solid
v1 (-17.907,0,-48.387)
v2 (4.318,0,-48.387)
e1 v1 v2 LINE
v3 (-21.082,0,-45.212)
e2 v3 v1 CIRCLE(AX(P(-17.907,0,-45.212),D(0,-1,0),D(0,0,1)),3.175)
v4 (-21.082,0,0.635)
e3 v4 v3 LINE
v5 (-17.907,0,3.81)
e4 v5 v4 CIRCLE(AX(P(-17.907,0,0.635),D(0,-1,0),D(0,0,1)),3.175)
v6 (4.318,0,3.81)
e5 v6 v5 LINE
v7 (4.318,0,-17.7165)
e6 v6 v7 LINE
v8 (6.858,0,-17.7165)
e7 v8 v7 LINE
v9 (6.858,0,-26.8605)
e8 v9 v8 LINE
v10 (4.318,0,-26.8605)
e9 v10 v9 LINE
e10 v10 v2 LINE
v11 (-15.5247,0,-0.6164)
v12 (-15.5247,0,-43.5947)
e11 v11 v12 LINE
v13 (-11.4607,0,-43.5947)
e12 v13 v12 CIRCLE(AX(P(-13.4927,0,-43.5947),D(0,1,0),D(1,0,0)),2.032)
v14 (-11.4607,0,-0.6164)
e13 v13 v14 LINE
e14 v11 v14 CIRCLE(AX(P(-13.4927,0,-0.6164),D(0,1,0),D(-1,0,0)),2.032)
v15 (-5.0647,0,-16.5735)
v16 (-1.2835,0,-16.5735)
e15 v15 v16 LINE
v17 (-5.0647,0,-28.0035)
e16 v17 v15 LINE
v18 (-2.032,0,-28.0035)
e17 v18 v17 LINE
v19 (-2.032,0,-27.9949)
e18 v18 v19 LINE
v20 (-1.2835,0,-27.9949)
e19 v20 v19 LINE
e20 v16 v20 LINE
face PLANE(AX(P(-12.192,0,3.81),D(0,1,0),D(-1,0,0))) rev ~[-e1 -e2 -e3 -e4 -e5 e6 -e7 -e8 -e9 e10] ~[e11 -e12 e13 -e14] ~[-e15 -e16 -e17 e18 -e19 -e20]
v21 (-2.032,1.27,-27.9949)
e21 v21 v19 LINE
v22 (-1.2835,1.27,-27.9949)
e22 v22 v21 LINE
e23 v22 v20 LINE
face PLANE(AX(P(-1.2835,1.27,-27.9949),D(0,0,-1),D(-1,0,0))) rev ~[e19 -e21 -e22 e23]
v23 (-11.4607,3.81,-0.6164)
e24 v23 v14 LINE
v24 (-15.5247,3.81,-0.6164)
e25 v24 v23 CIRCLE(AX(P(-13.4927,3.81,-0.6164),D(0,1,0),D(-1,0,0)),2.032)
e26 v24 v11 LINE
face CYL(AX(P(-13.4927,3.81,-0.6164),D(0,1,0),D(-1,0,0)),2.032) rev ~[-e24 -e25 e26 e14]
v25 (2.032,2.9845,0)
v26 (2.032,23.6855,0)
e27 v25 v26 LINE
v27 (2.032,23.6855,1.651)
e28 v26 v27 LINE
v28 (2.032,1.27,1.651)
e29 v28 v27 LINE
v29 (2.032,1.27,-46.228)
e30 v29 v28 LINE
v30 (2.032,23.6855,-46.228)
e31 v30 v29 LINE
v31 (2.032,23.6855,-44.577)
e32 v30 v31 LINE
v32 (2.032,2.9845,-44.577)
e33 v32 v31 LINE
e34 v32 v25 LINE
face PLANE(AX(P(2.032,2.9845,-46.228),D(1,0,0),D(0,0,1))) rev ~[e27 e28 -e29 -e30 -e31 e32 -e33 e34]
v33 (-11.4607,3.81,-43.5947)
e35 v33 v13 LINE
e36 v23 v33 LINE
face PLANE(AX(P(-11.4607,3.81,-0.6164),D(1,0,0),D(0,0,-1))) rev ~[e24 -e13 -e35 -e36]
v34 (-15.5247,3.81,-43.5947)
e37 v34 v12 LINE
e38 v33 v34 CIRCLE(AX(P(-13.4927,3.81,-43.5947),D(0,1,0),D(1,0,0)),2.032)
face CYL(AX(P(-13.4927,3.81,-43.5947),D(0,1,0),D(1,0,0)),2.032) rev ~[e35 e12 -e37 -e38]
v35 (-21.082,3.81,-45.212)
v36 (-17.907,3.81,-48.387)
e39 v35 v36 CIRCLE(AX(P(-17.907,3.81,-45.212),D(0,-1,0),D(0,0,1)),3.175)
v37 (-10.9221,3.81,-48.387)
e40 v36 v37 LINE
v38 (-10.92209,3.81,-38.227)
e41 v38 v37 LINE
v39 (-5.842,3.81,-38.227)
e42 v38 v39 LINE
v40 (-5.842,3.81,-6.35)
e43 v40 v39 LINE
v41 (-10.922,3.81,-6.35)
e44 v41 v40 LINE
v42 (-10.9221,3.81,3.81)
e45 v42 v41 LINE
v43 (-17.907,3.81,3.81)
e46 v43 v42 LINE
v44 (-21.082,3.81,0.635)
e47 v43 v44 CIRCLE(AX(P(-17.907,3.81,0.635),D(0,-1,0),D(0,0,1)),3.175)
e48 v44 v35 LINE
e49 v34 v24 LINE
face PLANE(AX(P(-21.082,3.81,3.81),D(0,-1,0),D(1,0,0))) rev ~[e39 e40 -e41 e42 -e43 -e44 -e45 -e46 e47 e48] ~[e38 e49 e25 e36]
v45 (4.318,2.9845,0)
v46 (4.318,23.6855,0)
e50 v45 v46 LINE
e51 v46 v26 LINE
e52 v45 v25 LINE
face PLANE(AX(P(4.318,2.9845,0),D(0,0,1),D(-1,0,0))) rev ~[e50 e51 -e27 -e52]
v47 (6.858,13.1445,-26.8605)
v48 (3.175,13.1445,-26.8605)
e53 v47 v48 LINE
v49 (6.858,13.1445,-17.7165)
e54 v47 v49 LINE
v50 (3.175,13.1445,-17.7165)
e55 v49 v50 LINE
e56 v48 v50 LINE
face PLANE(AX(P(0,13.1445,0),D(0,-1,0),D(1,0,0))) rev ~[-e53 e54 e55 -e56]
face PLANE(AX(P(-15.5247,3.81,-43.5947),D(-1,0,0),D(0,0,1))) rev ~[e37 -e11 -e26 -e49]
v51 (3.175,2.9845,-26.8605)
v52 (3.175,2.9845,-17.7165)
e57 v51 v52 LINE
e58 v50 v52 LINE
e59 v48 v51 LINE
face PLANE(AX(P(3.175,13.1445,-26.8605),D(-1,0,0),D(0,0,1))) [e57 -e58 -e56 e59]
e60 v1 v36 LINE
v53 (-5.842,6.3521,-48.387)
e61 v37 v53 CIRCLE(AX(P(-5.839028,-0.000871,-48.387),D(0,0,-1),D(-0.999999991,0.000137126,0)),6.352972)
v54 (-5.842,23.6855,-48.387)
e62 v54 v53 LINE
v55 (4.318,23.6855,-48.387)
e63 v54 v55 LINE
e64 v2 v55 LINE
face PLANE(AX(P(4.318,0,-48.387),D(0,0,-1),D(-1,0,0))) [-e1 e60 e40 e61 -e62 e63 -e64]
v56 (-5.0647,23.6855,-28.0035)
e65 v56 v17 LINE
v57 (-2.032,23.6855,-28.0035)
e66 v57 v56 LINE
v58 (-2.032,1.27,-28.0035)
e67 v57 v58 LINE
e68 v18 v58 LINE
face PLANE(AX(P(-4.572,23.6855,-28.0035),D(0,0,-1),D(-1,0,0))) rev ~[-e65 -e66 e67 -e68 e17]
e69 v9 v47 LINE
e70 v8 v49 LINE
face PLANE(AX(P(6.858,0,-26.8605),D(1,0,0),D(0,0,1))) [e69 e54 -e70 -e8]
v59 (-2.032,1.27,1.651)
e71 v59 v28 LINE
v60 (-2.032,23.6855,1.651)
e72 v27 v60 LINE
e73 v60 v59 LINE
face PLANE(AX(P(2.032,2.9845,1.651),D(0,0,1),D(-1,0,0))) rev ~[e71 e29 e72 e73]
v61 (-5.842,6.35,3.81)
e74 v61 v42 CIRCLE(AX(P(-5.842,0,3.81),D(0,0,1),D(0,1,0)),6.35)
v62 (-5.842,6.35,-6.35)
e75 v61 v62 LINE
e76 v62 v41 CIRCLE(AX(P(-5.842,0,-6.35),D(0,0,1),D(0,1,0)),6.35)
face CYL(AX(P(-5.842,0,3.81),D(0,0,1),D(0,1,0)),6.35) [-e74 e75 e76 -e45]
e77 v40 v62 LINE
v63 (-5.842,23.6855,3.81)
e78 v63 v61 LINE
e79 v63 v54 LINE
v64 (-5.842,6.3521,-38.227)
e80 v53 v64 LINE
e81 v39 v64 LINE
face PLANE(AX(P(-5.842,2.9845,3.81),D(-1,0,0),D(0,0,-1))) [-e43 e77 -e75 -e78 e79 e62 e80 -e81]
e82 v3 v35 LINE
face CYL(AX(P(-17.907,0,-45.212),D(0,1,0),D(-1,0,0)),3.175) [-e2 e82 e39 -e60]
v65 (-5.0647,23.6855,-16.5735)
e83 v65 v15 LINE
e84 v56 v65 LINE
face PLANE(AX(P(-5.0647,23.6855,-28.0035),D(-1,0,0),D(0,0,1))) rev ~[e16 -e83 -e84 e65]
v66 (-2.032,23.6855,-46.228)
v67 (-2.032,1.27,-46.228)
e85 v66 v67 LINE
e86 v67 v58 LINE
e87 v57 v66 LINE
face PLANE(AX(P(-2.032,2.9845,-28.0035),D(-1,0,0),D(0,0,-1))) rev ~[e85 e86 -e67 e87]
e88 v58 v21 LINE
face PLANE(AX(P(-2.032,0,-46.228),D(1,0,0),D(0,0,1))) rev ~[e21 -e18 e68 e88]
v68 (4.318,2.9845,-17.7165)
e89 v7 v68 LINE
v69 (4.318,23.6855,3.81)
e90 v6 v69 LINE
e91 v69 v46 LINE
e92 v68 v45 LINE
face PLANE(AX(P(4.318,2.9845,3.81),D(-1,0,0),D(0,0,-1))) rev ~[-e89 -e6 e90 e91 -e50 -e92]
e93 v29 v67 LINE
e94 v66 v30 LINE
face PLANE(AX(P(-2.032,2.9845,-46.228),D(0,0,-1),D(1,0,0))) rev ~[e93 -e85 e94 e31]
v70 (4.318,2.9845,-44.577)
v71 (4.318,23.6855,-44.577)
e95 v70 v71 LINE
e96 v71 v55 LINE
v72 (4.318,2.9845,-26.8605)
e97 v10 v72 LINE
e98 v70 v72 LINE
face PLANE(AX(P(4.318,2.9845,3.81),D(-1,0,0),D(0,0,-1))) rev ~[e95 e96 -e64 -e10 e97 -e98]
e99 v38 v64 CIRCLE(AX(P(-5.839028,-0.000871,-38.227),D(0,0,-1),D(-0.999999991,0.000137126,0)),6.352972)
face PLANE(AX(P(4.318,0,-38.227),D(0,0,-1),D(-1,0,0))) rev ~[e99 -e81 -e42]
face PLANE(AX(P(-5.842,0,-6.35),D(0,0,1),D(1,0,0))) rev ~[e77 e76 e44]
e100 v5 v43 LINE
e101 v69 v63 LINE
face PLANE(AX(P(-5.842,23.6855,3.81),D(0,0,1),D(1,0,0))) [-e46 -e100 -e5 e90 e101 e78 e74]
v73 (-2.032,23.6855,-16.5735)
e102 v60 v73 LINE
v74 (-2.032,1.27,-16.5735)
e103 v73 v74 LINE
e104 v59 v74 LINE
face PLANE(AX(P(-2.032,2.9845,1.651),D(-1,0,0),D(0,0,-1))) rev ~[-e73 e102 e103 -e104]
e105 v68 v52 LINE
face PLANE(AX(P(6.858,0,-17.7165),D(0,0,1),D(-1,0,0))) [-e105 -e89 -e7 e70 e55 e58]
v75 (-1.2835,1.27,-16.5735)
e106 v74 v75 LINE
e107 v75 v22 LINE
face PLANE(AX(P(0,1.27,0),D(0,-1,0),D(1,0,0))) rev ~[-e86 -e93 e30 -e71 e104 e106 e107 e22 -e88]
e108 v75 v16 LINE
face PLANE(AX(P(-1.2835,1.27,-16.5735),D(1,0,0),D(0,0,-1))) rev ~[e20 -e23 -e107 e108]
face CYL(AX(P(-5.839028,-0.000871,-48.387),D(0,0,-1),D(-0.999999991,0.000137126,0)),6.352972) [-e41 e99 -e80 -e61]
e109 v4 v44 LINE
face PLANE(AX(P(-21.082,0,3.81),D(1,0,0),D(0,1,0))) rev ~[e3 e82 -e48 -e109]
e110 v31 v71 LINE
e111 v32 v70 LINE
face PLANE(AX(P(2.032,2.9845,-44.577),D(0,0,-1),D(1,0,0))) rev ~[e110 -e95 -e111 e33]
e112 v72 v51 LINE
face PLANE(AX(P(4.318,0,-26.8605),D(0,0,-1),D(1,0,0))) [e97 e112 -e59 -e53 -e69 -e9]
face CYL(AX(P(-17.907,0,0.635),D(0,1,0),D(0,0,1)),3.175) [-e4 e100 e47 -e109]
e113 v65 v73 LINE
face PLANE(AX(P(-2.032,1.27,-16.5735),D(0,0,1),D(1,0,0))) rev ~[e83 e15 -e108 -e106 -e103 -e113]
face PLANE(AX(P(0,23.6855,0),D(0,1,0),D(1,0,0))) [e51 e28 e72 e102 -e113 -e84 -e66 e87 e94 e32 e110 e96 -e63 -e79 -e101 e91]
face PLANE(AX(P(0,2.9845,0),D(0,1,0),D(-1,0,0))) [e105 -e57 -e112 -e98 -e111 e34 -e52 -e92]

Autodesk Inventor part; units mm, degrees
ref_plane "YZ Plane" through (0, 0, 0) normal (1, 0, 0) x (0, 1, 0)
ref_plane "XZ Plane" through (0, 0, 0) normal (0, 1, 0) x (-1, 0, 0)
ref_plane "XY Plane" through (0, 0, 0) normal (0, 0, 1) x (1, 0, 0)
sketch "Sketch1" plane through (0, 0, 0) normal (0, 1, 0) x (-1, 0, 0)
  line L0 (0, 0) -> (2.032, 0) construction
  line L1 (0, 0) -> (-2.032, 0) construction
  line L2 (-4.318, 0) -> (-4.318, 3.81)
  line L3 (-4.318, 3.81) -> (5.842, 3.81)
  line L4 (-2.032, 0) -> (-2.032, 1.651)
  line L5 (-2.032, 1.651) -> (2.032, 1.651)
  line L6 (2.032, -46.228) -> (-2.032, -46.228)
  line L7 (-2.032, -46.228) -> (-2.032, -44.577)
  line L8 (-4.318, -44.577) -> (-4.318, -48.387)
  line L9 (-4.318, -48.387) -> (5.842, -48.387)
  line L10 (2.032, 1.651) -> (2.032, -16.5735)
  line L11 (2.032, -16.5735) -> (4.572, -16.5735)
  line L12 (4.572, -16.5735) -> (4.572, -28.0035)
  line L13 (4.572, -28.0035) -> (2.032, -28.0035)
  line L14 (2.032, -28.0035) -> (2.032, -46.228)
  line L15 (5.842, 3.81) -> (5.842, -48.387)
  line L16 (-2.032, -40.8058) -> (4.191, -40.8058) construction
  line L17 (-2.032, 0) -> (-2.032, -44.577)
  line L18 (-4.318, 0) -> (-4.318, -44.577)
  dimension "d0" = 2.032
  dimension "d1" = 2.032
  dimension "d3" = 2.286
  dimension "d5" = 3.81
  dimension "d7" = 10.16
  dimension "d8" = 4.064
  dimension "d9" = 2.159
  dimension "d10" = 1.651
  dimension "d12" = 2.286
  dimension "d13" = 3.81
  dimension "d14" = 1.651
  dimension "d15" = 4.064
  dimension "d16" = 10.16
  dimension "d17" = 11.43
  dimension "d18" = 2.159
  dimension "d19" = 18.2245
  dimension "d21" = 6.223
  dimension "d22" = 2.54
  dimension "d37" = 18.2245
  dimension "d38" = 52.197
  dimension "d39" = 44.577
extrude "Extrusion1" add sketch "Sketch1" along normal blind 2.9845
sketch "Sketch10" plane through (0, 0, 0) normal (0, -1, 0) x (1, 0, 0)
  line L0 (-2.032, 1.651) -> (-2.032, -16.5735) projected
  line L1 (2.032, -46.228) -> (2.032, 1.651) projected
  line L2 (-2.032, 1.651) -> (2.032, 1.651)
  line L3 (2.032, 1.651) -> (2.032, -46.228)
  line L4 (2.032, -46.228) -> (-2.032, -46.228)
  line L5 (-2.032, -46.228) -> (-2.032, 1.651)
  point P0 (0, 0)
extrude "Extrusion5" add sketch "Sketch10" against normal blind 1.27
sketch "Sketch11" plane through (0, 2.9845, 0) normal (0, 1, 0) x (1, 0, 0)
  line L0 (4.318, -3.81) -> (-5.842, -3.81)
  line L1 (-5.842, -3.81) -> (-5.842, 48.387) projected
  line L2 (-5.842, -3.81) -> (-5.842, 48.387)
  line L3 (4.318, 48.387) -> (4.318, 44.577) construction
  line L4 (4.318, -3.81) -> (4.318, 48.387) construction
  line L5 (4.318, -3.81) -> (4.318, 0) construction
  line L6 (4.318, -3.81) -> (4.318, 0)
  line L7 (4.318, 0) -> (2.032, 0)
  line L8 (2.032, 46.228) -> (2.032, -1.651) projected
  line L9 (2.032, -1.651) -> (-2.032, -1.651) projected
  line L10 (2.032, -1.651) -> (-2.032, -1.651)
  line L11 (-2.032, 28.0035) -> (-2.032, 16.5735) projected
  line L12 (-2.032, -1.651) -> (-2.032, 16.5735)
  line L13 (-2.032, -1.651) -> (-2.032, 16.5735) projected
  line L14 (-4.572, 16.5735) -> (-2.032, 16.5735) projected
  line L15 (-2.032, 16.5735) -> (-4.572, 16.5735)
  line L16 (-4.572, 16.5735) -> (-4.572, 28.0035) projected
  line L17 (-4.572, 16.5735) -> (-4.572, 28.0035)
  line L18 (-2.032, 28.0035) -> (-4.572, 28.0035) projected
  line L19 (-4.572, 28.0035) -> (-2.032, 28.0035)
  line L20 (-2.032, 28.0035) -> (-2.032, 46.228)
  line L21 (-2.032, 46.228) -> (2.032, 46.228)
  line L22 (2.032, 46.228) -> (2.032, 44.577)
  line L23 (2.032, 44.577) -> (4.318, 44.577)
  line L24 (4.318, 44.577) -> (4.318, 48.387)
  line L25 (-5.842, 48.387) -> (4.318, 48.387)
  point P0 (0, 0)
  dimension "d43" = 3.81
  dimension "d44" = 3.81
extrude "Extrusion6" add sketch "Sketch11" along normal blind 20.701 contours L0 L1 L25 L24 L23 L8 L21 L20 L18 L16 L14 L12 L9 L7 L6
sketch "Sketch12" plane through (-5.842, 0, 3.81) normal (0, 0, 1) x (1, 0, 0)
  line L0 (0, 0) -> (0, 23.6855) construction
  line L1 (10.16, 0) -> (0, 0) construction
  line L2 (0, 0) -> (0, 23.6855) projected
  line L3 (0, 0) -> (-6.35, 0) construction
  line L4 (0, 0) -> (0, 6.35) construction
  arc A0 (0, 6.35) -> (-6.35, 0) centre (0, 0) ccw
  line L5 (-6.35, 0) -> (0, 0)
  line L6 (0, 0) -> (0, 6.35)
  point P0 (5.842, 0)
  dimension "d54" = 6.35
  dimension "d55" = 6.35
  dimension "d56" = 6.35
extrude "Extrusion7" add sketch "Sketch12" against normal blind 10.16
sketch "Sketch14" plane through (4.318, 0, -48.387) normal (0, 0, -1) x (-1, 0, 0)
  line L0 (10.16, 0) -> (0, 0) projected
  line L1 (10.16, 0) -> (10.16, 6.3521)
  line L2 (10.16, 0) -> (10.16, 23.6855) projected
  line L3 (0, 0) -> (16.51, 0) projected
  line L4 (10.16, 0) -> (16.51, 0)
  arc A0 (16.51, 0) -> (10.16, 6.3521) centre (10.1572, -0.0008) ccw
  point P0 (4.318, 0)
extrude "Extrusion8" add sketch "Sketch14" against normal blind 10.16
sketch "Sketch16" plane through (0, 0, 0) normal (0, -1, 0) x (1, 0, 0)
  line L0 (-12.192, -38.227) -> (-5.842, -38.227) projected
  line L1 (-5.842, -38.227) -> (-21.082, -38.227)
  line L2 (-21.082, -38.227) -> (-21.082, -6.35)
  line L3 (-21.082, -6.35) -> (-5.842, -6.35)
  line L4 (-5.842, -6.35) -> (-5.842, -38.227)
  point P0 (0, 0)
  point P1 (-12.192, -6.35)
  dimension "d63" = 15.24
extrude "Extrusion9" add sketch "Sketch16" against normal blind 3.81
sketch "Sketch17" plane through (0, 3.81, 0) normal (0, 1, 0) x (1, 0, 0)
  circle A0 centre (-13.462, 29.4323) radius 1.9844
  circle A1 centre (-13.2021, 15.1448) radius 1.9844
  line L0 (-5.842, 38.227) -> (-5.842, 6.35) construction
  line L1 (-5.842, 36.0862) -> (-21.082, 36.0862) construction
  line L2 (-21.082, 38.227) -> (-21.082, 6.35) construction
  line L3 (-21.082, 37.0641) -> (-13.462, 37.0641) construction
  line L4 (-10.9221, 38.227) -> (-21.082, 38.227) construction
  line L5 (-12.933, 38.227) -> (-12.933, 6.35) construction
  line L6 (-21.082, 6.35) -> (-12.192, 6.35) construction
  line L7 (-21.082, 6.35) -> (-10.922, 6.35) construction
  line L8 (-5.842, 6.35) -> (-10.922, 6.35) construction
  line L9 (-13.462, 29.4323) -> (-13.462, 38.227) construction
  line L10 (-13.2021, 15.1448) -> (-13.2021, 6.35) construction
  point P0 (0, 0)
  dimension "d66" = 3.9688
  dimension "d67" = 3.9688
  dimension "d68" = 15.24
  dimension "d69" = 7.62
  dimension "d70" = 31.877
  dimension "d72" = 7.62
  dimension "d90" = 14.2875
extrude "Extrusion10" cut sketch "Sketch17" against normal blind 3.81
sketch "Sketch18" plane through (4.318, 0, 3.81) normal (1, 0, 0) x (0, 0, -1)
  line L0 (0, 1.944) -> (52.197, 1.944) construction
  line L1 (52.197, 0) -> (52.197, 6.3521) construction
  line L2 (0, 0) -> (0, 23.6855) construction
  line L3 (0, 2.5647) -> (21.5265, 2.5647) construction
  line L4 (48.387, 2.9845) -> (3.81, 2.9845) projected
  line L5 (21.5265, 2.9845) -> (30.6705, 2.9845)
  line L6 (21.5265, 2.9845) -> (21.5265, 13.1445)
  line L7 (21.5265, 13.1445) -> (30.6705, 13.1445)
  line L8 (30.6705, 13.1445) -> (30.6705, 2.9845)
  point P0 (3.81, 0)
  dimension "d79" = 52.197
  dimension "d80" = 21.5265
  dimension "d82" = 10.16
extrude "Extrusion11" add sketch "Sketch18" against normal blind 2.286
sketch "Sketch20" plane through (0, 23.6855, 0) normal (0, 1, 0) x (1, 0, 0)
  line L0 (-4.572, 16.5735) -> (-4.572, 28.0035) projected
  line L1 (-4.572, 28.0035) -> (-5.0647, 28.0035)
  line L2 (-5.0647, 28.0035) -> (-5.0647, 16.5735)
  line L3 (-5.0647, 16.5735) -> (-4.572, 16.5735)
  line L4 (-4.572, 16.5735) -> (-4.572, 28.0035)
  point P0 (0, 0)
extrude "Extrusion12" cut sketch "Sketch20" against normal up to next
sketch "Sketch21" plane through (0, 1.27, 0) normal (0, 1, 0) x (1, 0, 0)
  line L0 (-2.032, 16.5735) -> (-1.2835, 16.5735)
  line L1 (-1.2835, 16.5735) -> (-1.2835, 27.9949)
  line L2 (-1.2835, 27.9949) -> (-2.032, 27.9949)
  line L3 (-2.032, 27.9949) -> (-2.032, 16.5735)
  point P0 (0, 0)
extrude "Extrusion13" cut sketch "Sketch21" against normal up to next
sketch "Sketch22" plane through (0, 0, 0) normal (0, -1, 0) x (1, 0, 0)
  line L0 (2.032, -26.8605) -> (4.318, -26.8605) projected
  line L1 (4.318, -26.8605) -> (4.318, -17.6876)
  line L2 (4.318, -48.387) -> (4.318, 3.81) projected
  line L3 (4.318, -26.8605) -> (6.858, -26.8605)
  line L4 (6.858, -26.8605) -> (6.858, -17.7165)
  line L5 (6.858, -17.7165) -> (4.318, -17.7165)
  line L6 (4.318, -17.7165) -> (4.318, -26.8605)
  point P0 (0, 0)
  dimension "d91" = 2.54
extrude "Extrusion14" add sketch "Sketch22" against normal up to surface (13.1445 mm away)
sketch "Sketch23" plane through (2.032, 13.1445, -17.7165) normal (0, 1, 0) x (1, 0, 0)
  line L0 (0, 9.144) -> (4.826, 9.144) projected
  line L1 (2.286, 0) -> (0, 0) projected
  line L2 (0, 9.144) -> (1.143, 9.144)
  line L3 (1.143, 9.144) -> (1.143, 0)
  line L4 (1.143, 0) -> (0, 0)
  line L5 (0, 0) -> (0, 9.144)
  point P0 (-2.032, -17.7165)
extrude "Extrusion15" cut sketch "Sketch23" against normal up to surface (10.16 mm away)
sketch "Sketch24" plane through (-5.842, 23.6855, 3.81) normal (0, 0, 1) x (1, 0, 0)
  line L0 (0, -17.3334) -> (0, 0) projected
  line L1 (-6.35, -23.6855) -> (-15.24, -23.6855) projected
  line L2 (-15.24, -23.6855) -> (0, -23.6855)
  line L3 (-15.24, -23.6855) -> (-15.24, -19.8755) projected
  line L4 (-15.24, -23.6855) -> (-15.24, -19.8755)
  line L5 (-5.0801, -19.8755) -> (0, -19.8755) projected
  line L6 (-15.24, -19.8755) -> (0, -19.8755)
  line L7 (0, -19.8755) -> (0, -23.6855)
  point P0 (5.842, -23.6855)
sketch "Sketch25" plane through (0, 3.81, 0) normal (0, 1, 0) x (1, 0, 0)
  line L0 (-15.4123, 29.8338) -> (-11.4776, 29.4323) construction
  circle A0 centre (-13.462, 29.4323) radius 1.9844 construction
  line L1 (-15.4464, 29.4323) -> (-11.4776, 29.4323) construction
  circle A1 centre (-13.462, 29.4323) radius 1.9844 construction
  point P0 (0, 0)
extrude "Extrusion16" add sketch "Sketch24" against normal up to surface (52.197 mm away)
sketch "Sketch26" plane through (0, 3.81, 0) normal (0, 1, 0) x (1, 0, 0)
  line L0 (-13.4927, 29.4297) -> (-13.4927, 21.7166) construction
  line L1 (6.858, 26.8605) -> (6.858, 17.7165) construction
  line L2 (6.858, 22.1055) -> (-21.082, 22.1055) construction
  line L3 (-21.082, -3.81) -> (-21.082, 48.387) construction
  line L4 (-13.4927, 0.6164) -> (-13.4927, 43.5947) construction
  line L5 (-11.4607, 0.6164) -> (-11.4607, 43.5947) construction
  line L6 (-15.5247, 43.5947) -> (-15.5247, 0.6164) construction
  arc A0 (-15.5247, 0.6164) -> (-11.4607, 0.6164) centre (-13.4927, 0.6164) ccw construction
  arc A1 (-11.4607, 43.5947) -> (-15.5247, 43.5947) centre (-13.4927, 43.5947) ccw construction
  line L7 (-13.4927, 0.6164) -> (-13.4927, 43.5947) construction
  line L8 (-11.4607, 0.6164) -> (-11.4607, 43.5947)
  line L9 (-15.5247, 43.5947) -> (-15.5247, 0.6164)
  arc A2 (-15.5247, 0.6164) -> (-11.4607, 0.6164) centre (-13.4927, 0.6164) ccw
  arc A3 (-11.4607, 43.5947) -> (-15.5247, 43.5947) centre (-13.4927, 43.5947) ccw
  point P0 (0, 0)
  point P1 (-13.4927, 22.1055)
  dimension "d98" = 4.064
extrude "Extrusion17" cut sketch "Sketch26" against normal up to next
fillet "Fillet1" radius 3.175 2 edges at (-21.082, 1.905, 3.81) (-21.082, 1.905, -48.387)
properties part number "better ultrasonic holder"
